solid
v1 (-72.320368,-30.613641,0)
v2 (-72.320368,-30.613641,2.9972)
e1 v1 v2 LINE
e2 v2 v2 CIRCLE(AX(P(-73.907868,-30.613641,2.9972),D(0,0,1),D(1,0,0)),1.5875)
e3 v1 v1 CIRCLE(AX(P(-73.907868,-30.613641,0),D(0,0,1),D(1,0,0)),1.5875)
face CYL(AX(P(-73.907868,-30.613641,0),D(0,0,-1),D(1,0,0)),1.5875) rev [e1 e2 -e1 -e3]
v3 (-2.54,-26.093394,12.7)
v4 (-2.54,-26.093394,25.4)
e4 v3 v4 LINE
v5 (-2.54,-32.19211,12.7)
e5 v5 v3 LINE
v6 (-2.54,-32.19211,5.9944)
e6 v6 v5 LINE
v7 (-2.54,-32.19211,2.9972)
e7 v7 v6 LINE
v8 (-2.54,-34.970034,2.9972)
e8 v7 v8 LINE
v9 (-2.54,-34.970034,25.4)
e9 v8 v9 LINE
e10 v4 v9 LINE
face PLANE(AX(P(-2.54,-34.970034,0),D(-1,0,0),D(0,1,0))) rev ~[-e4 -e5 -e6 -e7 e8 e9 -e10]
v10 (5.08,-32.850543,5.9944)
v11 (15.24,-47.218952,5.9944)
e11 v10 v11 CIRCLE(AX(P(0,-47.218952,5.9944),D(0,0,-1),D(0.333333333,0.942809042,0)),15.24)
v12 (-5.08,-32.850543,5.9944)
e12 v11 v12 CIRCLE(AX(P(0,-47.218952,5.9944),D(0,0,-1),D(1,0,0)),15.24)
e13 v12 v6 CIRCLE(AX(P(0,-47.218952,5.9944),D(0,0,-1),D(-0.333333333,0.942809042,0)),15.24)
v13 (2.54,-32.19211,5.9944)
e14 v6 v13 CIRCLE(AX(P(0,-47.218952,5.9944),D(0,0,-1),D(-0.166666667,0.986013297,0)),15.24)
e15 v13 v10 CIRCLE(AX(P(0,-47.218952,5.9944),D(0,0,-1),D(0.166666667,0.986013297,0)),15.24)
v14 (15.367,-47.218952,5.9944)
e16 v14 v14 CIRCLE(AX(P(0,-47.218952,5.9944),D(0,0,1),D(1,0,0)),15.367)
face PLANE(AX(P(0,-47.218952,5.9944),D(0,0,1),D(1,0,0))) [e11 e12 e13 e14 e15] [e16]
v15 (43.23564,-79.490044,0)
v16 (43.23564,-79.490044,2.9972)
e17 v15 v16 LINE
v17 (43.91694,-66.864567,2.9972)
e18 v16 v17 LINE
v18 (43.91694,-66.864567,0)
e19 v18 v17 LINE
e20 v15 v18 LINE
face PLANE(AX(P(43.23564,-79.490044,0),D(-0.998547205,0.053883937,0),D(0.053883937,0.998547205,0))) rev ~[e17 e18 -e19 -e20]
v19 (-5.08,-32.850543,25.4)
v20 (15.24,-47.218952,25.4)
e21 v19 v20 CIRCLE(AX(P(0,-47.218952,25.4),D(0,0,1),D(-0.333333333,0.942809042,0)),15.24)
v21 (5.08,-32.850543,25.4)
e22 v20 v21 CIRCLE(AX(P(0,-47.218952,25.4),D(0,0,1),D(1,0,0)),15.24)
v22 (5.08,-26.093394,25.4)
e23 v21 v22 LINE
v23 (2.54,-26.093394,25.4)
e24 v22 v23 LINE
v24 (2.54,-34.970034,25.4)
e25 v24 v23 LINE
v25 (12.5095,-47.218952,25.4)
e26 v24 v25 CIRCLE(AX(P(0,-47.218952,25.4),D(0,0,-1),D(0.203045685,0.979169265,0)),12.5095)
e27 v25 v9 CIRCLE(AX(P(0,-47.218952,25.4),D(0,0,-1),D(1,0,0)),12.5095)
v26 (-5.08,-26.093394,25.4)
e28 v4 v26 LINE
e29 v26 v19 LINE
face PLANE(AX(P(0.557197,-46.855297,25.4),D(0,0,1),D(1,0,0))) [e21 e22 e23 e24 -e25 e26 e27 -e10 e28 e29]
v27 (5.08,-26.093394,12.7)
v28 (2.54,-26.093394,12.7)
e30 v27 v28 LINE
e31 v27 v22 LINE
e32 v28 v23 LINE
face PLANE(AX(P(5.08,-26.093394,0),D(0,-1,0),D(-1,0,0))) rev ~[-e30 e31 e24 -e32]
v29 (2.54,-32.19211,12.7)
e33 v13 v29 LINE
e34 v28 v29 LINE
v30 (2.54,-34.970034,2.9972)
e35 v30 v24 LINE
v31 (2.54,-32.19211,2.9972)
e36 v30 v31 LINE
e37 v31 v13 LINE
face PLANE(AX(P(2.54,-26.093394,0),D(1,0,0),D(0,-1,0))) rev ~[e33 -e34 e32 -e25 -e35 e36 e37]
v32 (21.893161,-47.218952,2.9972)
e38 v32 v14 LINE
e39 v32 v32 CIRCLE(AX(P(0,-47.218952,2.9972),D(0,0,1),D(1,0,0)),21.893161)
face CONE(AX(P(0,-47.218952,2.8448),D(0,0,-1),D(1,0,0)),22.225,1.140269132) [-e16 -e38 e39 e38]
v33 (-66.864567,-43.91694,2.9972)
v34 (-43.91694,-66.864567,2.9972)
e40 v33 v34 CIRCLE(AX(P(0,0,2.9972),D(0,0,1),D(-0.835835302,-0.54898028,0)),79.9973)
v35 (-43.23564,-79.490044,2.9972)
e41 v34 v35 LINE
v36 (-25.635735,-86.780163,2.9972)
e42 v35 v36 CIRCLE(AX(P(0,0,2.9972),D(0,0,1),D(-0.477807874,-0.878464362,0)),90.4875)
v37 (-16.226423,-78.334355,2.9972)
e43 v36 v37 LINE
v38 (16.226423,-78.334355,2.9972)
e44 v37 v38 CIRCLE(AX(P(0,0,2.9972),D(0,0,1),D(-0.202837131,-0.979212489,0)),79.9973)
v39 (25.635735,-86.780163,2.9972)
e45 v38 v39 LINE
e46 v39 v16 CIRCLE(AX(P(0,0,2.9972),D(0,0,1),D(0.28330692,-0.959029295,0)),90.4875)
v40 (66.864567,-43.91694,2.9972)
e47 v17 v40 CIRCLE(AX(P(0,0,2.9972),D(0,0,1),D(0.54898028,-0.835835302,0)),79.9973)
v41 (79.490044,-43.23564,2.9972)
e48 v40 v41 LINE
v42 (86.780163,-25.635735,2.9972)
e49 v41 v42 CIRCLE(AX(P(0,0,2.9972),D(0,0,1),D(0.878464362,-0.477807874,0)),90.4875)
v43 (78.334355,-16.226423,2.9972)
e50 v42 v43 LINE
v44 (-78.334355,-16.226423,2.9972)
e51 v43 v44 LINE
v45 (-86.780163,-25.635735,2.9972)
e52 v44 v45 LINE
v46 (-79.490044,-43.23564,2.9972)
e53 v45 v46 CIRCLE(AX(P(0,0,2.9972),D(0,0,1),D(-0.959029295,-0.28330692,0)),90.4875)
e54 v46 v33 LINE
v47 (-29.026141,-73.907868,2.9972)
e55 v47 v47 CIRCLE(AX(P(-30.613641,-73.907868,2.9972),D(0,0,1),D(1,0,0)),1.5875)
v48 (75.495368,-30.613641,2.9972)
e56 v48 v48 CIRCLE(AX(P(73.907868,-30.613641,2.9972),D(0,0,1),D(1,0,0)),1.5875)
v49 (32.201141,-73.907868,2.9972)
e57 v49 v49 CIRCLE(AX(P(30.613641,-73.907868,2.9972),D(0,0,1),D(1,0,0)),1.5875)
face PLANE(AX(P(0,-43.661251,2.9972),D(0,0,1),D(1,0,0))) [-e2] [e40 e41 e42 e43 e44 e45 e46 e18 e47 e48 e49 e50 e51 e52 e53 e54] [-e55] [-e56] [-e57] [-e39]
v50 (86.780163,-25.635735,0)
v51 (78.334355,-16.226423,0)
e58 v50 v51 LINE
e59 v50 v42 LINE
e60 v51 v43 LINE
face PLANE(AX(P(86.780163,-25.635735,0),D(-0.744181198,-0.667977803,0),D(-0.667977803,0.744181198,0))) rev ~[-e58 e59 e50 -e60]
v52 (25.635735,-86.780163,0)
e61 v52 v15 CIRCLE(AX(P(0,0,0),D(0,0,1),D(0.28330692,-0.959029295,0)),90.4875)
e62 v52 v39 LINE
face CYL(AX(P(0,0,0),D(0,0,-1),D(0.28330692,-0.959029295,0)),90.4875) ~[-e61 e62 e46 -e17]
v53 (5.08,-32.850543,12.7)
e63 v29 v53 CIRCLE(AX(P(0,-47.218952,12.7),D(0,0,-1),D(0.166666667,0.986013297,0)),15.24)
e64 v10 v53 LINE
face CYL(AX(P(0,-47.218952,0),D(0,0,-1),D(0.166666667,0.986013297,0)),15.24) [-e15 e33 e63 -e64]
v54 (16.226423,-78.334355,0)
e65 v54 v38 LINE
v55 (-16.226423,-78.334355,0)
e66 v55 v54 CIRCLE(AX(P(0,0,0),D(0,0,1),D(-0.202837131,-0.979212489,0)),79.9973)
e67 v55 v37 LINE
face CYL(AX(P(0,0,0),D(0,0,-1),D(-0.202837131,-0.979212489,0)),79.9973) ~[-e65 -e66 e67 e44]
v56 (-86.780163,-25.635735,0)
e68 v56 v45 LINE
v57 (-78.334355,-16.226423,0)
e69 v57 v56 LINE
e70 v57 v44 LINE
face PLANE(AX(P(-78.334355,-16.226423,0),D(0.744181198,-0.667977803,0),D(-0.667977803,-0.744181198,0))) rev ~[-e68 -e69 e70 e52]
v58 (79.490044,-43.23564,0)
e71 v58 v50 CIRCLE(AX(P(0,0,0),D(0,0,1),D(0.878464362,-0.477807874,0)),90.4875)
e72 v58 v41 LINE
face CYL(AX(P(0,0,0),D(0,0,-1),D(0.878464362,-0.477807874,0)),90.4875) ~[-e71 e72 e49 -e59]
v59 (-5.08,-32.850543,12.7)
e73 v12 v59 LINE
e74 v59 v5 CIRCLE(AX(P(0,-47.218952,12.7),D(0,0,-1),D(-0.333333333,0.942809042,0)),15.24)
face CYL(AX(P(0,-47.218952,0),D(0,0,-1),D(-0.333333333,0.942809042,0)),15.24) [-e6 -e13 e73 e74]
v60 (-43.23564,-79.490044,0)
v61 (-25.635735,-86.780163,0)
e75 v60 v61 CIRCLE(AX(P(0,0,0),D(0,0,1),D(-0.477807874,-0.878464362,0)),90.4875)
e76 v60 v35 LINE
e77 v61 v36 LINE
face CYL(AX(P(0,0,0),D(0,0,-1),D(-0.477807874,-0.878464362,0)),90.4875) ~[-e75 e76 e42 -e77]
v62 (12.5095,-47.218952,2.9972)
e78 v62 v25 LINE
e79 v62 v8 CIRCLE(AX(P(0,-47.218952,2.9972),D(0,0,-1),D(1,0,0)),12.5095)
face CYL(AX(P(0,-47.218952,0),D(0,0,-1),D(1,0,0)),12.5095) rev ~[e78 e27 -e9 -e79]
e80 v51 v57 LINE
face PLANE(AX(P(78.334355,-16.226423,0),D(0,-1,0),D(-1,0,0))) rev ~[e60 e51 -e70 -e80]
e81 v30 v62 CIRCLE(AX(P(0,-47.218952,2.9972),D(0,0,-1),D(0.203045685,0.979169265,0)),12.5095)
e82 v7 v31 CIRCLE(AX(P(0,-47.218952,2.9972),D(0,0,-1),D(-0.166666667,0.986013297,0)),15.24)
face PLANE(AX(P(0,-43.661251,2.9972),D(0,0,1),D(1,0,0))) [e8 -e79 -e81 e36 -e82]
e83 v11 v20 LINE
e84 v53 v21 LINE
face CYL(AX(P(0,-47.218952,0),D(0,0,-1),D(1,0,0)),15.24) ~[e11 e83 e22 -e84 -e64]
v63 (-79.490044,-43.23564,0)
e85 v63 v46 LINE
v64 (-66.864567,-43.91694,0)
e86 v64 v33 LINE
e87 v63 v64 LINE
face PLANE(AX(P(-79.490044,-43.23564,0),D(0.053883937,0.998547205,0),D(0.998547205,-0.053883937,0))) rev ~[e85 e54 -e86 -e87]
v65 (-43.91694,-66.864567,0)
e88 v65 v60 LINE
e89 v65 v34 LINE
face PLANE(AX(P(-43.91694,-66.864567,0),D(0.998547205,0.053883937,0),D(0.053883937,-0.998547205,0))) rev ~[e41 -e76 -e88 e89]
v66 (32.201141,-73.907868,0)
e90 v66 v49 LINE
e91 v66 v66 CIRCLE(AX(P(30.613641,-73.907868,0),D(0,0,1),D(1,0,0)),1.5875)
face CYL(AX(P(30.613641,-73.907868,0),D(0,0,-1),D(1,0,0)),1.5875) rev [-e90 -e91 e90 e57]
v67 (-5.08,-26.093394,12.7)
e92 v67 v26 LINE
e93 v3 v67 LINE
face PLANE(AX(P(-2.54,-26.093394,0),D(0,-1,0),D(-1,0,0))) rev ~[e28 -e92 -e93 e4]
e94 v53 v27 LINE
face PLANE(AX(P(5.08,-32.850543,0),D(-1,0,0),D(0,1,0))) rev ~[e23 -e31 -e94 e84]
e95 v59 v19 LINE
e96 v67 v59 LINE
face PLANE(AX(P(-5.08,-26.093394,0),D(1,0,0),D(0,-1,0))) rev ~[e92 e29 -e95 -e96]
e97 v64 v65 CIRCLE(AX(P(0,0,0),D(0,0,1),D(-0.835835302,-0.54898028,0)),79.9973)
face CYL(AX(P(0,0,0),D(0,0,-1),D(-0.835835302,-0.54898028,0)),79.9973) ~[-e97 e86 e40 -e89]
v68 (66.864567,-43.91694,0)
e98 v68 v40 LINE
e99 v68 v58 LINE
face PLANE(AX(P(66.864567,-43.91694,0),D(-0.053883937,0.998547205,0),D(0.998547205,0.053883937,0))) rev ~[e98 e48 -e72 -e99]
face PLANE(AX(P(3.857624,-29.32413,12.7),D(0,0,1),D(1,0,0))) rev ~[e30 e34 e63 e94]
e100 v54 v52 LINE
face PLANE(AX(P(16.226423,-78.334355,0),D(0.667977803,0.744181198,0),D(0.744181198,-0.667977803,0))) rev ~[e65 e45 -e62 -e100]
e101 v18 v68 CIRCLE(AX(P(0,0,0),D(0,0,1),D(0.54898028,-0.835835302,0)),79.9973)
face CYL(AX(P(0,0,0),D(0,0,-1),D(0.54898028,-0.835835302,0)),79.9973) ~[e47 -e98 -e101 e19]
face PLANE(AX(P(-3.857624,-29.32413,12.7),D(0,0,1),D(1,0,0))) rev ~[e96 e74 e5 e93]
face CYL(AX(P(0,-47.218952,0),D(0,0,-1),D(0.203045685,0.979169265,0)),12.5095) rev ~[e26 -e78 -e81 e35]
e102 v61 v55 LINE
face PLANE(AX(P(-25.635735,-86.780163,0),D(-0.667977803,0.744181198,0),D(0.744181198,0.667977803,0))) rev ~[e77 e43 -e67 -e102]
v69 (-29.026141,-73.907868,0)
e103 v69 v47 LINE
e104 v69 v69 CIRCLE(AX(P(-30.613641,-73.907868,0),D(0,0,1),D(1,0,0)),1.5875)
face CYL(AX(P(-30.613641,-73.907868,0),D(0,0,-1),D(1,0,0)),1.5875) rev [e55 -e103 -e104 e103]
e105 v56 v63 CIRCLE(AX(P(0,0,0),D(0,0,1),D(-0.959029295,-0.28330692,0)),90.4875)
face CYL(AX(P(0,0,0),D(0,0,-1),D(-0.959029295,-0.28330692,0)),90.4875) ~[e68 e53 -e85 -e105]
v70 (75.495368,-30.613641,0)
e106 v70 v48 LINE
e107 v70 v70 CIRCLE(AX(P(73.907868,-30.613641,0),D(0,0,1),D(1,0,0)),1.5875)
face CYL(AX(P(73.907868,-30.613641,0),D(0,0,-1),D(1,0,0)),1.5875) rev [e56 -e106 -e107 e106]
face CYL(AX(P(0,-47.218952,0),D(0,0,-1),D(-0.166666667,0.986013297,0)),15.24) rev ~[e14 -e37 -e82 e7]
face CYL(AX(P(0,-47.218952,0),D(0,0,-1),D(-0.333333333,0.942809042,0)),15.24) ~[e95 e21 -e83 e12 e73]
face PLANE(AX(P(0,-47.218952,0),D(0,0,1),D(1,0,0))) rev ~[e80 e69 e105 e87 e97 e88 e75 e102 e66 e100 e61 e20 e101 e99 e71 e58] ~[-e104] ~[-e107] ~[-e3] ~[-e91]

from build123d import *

# Parameters (mm, degrees)
F0_R     = 1.5875
F0_R_2   = 22.225
F1_DEPTH = 2.9972
F2_DEPTH = 25.4
F3_DEPTH = 25.4
F4_DEPTH = 12.7
F5_DEPTH = 2.9972
F6_DEPTH = 5.9944


# Not quite as in the source:
# - a fillet or chamfer that OpenCascade refuses, or shapes differently, is made with other operations: its cross-section is extruded or revolved along the edge and cut away or added


with BuildPart() as f1:
    # F0 (on Top) → F1 (new body)
    with BuildSketch(Plane.XY):
        with BuildLine():
            Line((-78.3343552322, -16.2264228234), (-86.7801633577, -25.6357348999))
            ThreePointArc((-86.7801633577, -25.6357348999), (-83.5995491981, -34.6280670861), (-79.4900439712, -43.2356399943))
            Line((-79.4900439712, -43.2356399943), (-66.8645673974, -43.9169401718))
            ThreePointArc((-66.8645673974, -43.9169401718), (-56.5666333066, -56.5666333066), (-43.9169401718, -66.8645673974))
            Line((-43.9169401718, -66.8645673974), (-43.2356399943, -79.4900439712))
            ThreePointArc((-43.2356399943, -79.4900439712), (-34.6280670861, -83.5995491981), (-25.6357348999, -86.7801633577))
            Line((-25.6357348999, -86.7801633577), (-16.2264228234, -78.3343552322))
            ThreePointArc((-16.2264228234, -78.3343552322), (0, -79.9973), (16.2264228234, -78.3343552322))
            Line((16.2264228234, -78.3343552322), (25.6357348999, -86.7801633577))
            ThreePointArc((25.6357348999, -86.7801633577), (34.6280670861, -83.5995491981), (43.2356399943, -79.4900439712))
            Line((43.2356399943, -79.4900439712), (43.9169401718, -66.8645673974))
            ThreePointArc((43.9169401718, -66.8645673974), (56.5666333066, -56.5666333066), (66.8645673974, -43.9169401718))
            Line((66.8645673974, -43.9169401718), (79.4900439712, -43.2356399943))
            ThreePointArc((79.4900439712, -43.2356399943), (83.5995491981, -34.6280670861), (86.7801633577, -25.6357348999))
            Line((86.7801633577, -25.6357348999), (78.3343552322, -16.2264228234))
            Line((78.3343552322, -16.2264228234), (-78.3343552322, -16.2264228234))
        make_face()
        with Locations((-30.6136413439, -73.9078681262)):
            Circle(F0_R, mode=Mode.SUBTRACT)
        with Locations((30.6136413439, -73.9078681262)):
            Circle(F0_R, mode=Mode.SUBTRACT)
        with Locations((0, -47.218952328)):
            Circle(F0_R_2, mode=Mode.SUBTRACT)
        with Locations((-73.9078681262, -30.6136413439)):
            Circle(F0_R, mode=Mode.SUBTRACT)
        with Locations((73.9078681262, -30.6136413439)):
            Circle(F0_R, mode=Mode.SUBTRACT)
        with Locations((0, -47.218952328)):
            Circle(F0_R_2)
        with BuildLine():
            ThreePointArc((5.08, -32.8505425343), (12.4434078933, -38.4201342255), (15.24, -47.218952328))
            ThreePointArc((15.24, -47.218952328), (-8.7988181024, -59.6623602213), (-5.08, -32.8505425343))
            Line((-5.08, -32.8505425343), (-5.08, -26.0933935642))
            Line((-5.08, -26.0933935642), (-2.54, -26.0933935642))
            Line((-2.54, -26.0933935642), (-2.54, -32.1921096789))
            ThreePointArc((-2.54, -32.1921096789), (0, -31.978952328), (2.54, -32.1921096789))
            Line((2.54, -32.1921096789), (2.54, -26.0933935642))
            Line((2.54, -26.0933935642), (5.08, -26.0933935642))
            Line((5.08, -26.0933935642), (5.08, -32.8505425343))
        make_face(mode=Mode.SUBTRACT)
        with BuildLine():
            ThreePointArc((-5.08, -32.8505425343), (-8.7988181024, -59.6623602213), (15.24, -47.218952328))
            ThreePointArc((15.24, -47.218952328), (12.4434078933, -38.4201342255), (5.08, -32.8505425343))
            ThreePointArc((5.08, -32.8505425343), (3.8241970996, -32.466558741), (2.54, -32.1921096789))
            Line((2.54, -32.1921096789), (2.54, -34.9700344064))
            ThreePointArc((2.54, -34.9700344064), (9.7021059634, -39.3223245588), (12.5095, -47.218952328))
            ThreePointArc((12.5095, -47.218952328), (-7.8966277692, -56.9210582914), (-2.54, -34.9700344064))
            Line((-2.54, -34.9700344064), (-2.54, -32.1921096789))
            ThreePointArc((-2.54, -32.1921096789), (-3.8241970996, -32.466558741), (-5.08, -32.8505425343))
        make_face()
        with BuildLine():
            ThreePointArc((2.54, -32.1921096789), (3.8241970996, -32.466558741), (5.08, -32.8505425343))
            Line((5.08, -32.8505425343), (5.08, -26.0933935642))
            Line((5.08, -26.0933935642), (2.54, -26.0933935642))
            Line((2.54, -26.0933935642), (2.54, -32.1921096789))
        make_face()
        with BuildLine():
            Line((-5.08, -26.0933935642), (-5.08, -32.8505425343))
            ThreePointArc((-5.08, -32.8505425343), (-3.8241970996, -32.466558741), (-2.54, -32.1921096789))
            Line((-2.54, -32.1921096789), (-2.54, -26.0933935642))
            Line((-2.54, -26.0933935642), (-5.08, -26.0933935642))
        make_face()
        with BuildLine():
            Line((2.54, -34.9700344064), (2.54, -32.1921096789))
            ThreePointArc((2.54, -32.1921096789), (0, -31.978952328), (-2.54, -32.1921096789))
            Line((-2.54, -32.1921096789), (-2.54, -34.9700344064))
            ThreePointArc((-2.54, -34.9700344064), (0, -34.709452328), (2.54, -34.9700344064))
        make_face()
        with BuildLine():
            ThreePointArc((12.5095, -47.218952328), (9.7021059634, -39.3223245588), (2.54, -34.9700344064))
            ThreePointArc((2.54, -34.9700344064), (0, -34.709452328), (-2.54, -34.9700344064))
            ThreePointArc((-2.54, -34.9700344064), (-7.8966277692, -56.9210582914), (12.5095, -47.218952328))
        make_face()
    extrude(amount=F1_DEPTH)

    # F0 (on Top) → F2 (join)
    with BuildSketch(Plane.XY):
        with BuildLine():
            ThreePointArc((-5.08, -32.8505425343), (-8.7988181024, -59.6623602213), (15.24, -47.218952328))
            ThreePointArc((15.24, -47.218952328), (12.4434078933, -38.4201342255), (5.08, -32.8505425343))
            ThreePointArc((5.08, -32.8505425343), (3.8241970996, -32.466558741), (2.54, -32.1921096789))
            Line((2.54, -32.1921096789), (2.54, -34.9700344064))
            ThreePointArc((2.54, -34.9700344064), (9.7021059634, -39.3223245588), (12.5095, -47.218952328))
            ThreePointArc((12.5095, -47.218952328), (-7.8966277692, -56.9210582914), (-2.54, -34.9700344064))
            Line((-2.54, -34.9700344064), (-2.54, -32.1921096789))
            ThreePointArc((-2.54, -32.1921096789), (-3.8241970996, -32.466558741), (-5.08, -32.8505425343))
        make_face()
    extrude(amount=F2_DEPTH)

    # F0 (on Top) → F3 (join)
    with BuildSketch(Plane.XY):
        with BuildLine():
            ThreePointArc((-5.08, -32.8505425343), (-8.7988181024, -59.6623602213), (15.24, -47.218952328))
            ThreePointArc((15.24, -47.218952328), (12.4434078933, -38.4201342255), (5.08, -32.8505425343))
            ThreePointArc((5.08, -32.8505425343), (3.8241970996, -32.466558741), (2.54, -32.1921096789))
            Line((2.54, -32.1921096789), (2.54, -34.9700344064))
            ThreePointArc((2.54, -34.9700344064), (9.7021059634, -39.3223245588), (12.5095, -47.218952328))
            ThreePointArc((12.5095, -47.218952328), (-7.8966277692, -56.9210582914), (-2.54, -34.9700344064))
            Line((-2.54, -34.9700344064), (-2.54, -32.1921096789))
            ThreePointArc((-2.54, -32.1921096789), (-3.8241970996, -32.466558741), (-5.08, -32.8505425343))
        make_face()
        with BuildLine():
            ThreePointArc((2.54, -32.1921096789), (3.8241970996, -32.466558741), (5.08, -32.8505425343))
            Line((5.08, -32.8505425343), (5.08, -26.0933935642))
            Line((5.08, -26.0933935642), (2.54, -26.0933935642))
            Line((2.54, -26.0933935642), (2.54, -32.1921096789))
        make_face()
        with BuildLine():
            Line((-5.08, -26.0933935642), (-5.08, -32.8505425343))
            ThreePointArc((-5.08, -32.8505425343), (-3.8241970996, -32.466558741), (-2.54, -32.1921096789))
            Line((-2.54, -32.1921096789), (-2.54, -26.0933935642))
            Line((-2.54, -26.0933935642), (-5.08, -26.0933935642))
        make_face()
    extrude(amount=F3_DEPTH)

    # F0 (on Top) → F4 (cut)
    with BuildSketch(Plane.XY):
        with BuildLine():
            ThreePointArc((2.54, -32.1921096789), (3.8241970996, -32.466558741), (5.08, -32.8505425343))
            Line((5.08, -32.8505425343), (5.08, -26.0933935642))
            Line((5.08, -26.0933935642), (2.54, -26.0933935642))
            Line((2.54, -26.0933935642), (2.54, -32.1921096789))
        make_face()
        with BuildLine():
            Line((-5.08, -26.0933935642), (-5.08, -32.8505425343))
            ThreePointArc((-5.08, -32.8505425343), (-3.8241970996, -32.466558741), (-2.54, -32.1921096789))
            Line((-2.54, -32.1921096789), (-2.54, -26.0933935642))
            Line((-2.54, -26.0933935642), (-5.08, -26.0933935642))
        make_face()
    extrude(amount=F4_DEPTH, mode=Mode.SUBTRACT)

    # F0 (on Top) → F5 (join)
    with BuildSketch(Plane.XY):
        with BuildLine():
            ThreePointArc((2.54, -32.1921096789), (3.8241970996, -32.466558741), (5.08, -32.8505425343))
            Line((5.08, -32.8505425343), (5.08, -26.0933935642))
            Line((5.08, -26.0933935642), (2.54, -26.0933935642))
            Line((2.54, -26.0933935642), (2.54, -32.1921096789))
        make_face()
        with BuildLine():
            Line((-5.08, -26.0933935642), (-5.08, -32.8505425343))
            ThreePointArc((-5.08, -32.8505425343), (-3.8241970996, -32.466558741), (-2.54, -32.1921096789))
            Line((-2.54, -32.1921096789), (-2.54, -26.0933935642))
            Line((-2.54, -26.0933935642), (-5.08, -26.0933935642))
        make_face()
    extrude(amount=F5_DEPTH)

    # F0 (on Top) → F6 (join)
    with BuildSketch(Plane.XY):
        with Locations((0, -47.218952328)):
            Circle(F0_R_2)
        with BuildLine():
            ThreePointArc((5.08, -32.8505425343), (12.4434078933, -38.4201342255), (15.24, -47.218952328))
            ThreePointArc((15.24, -47.218952328), (-8.7988181024, -59.6623602213), (-5.08, -32.8505425343))
            Line((-5.08, -32.8505425343), (-5.08, -26.0933935642))
            Line((-5.08, -26.0933935642), (-2.54, -26.0933935642))
            Line((-2.54, -26.0933935642), (-2.54, -32.1921096789))
            ThreePointArc((-2.54, -32.1921096789), (0, -31.978952328), (2.54, -32.1921096789))
            Line((2.54, -32.1921096789), (2.54, -26.0933935642))
            Line((2.54, -26.0933935642), (5.08, -26.0933935642))
            Line((5.08, -26.0933935642), (5.08, -32.8505425343))
        make_face(mode=Mode.SUBTRACT)
        with BuildLine():
            ThreePointArc((2.54, -32.1921096789), (3.8241970996, -32.466558741), (5.08, -32.8505425343))
            Line((5.08, -32.8505425343), (5.08, -26.0933935642))
            Line((5.08, -26.0933935642), (2.54, -26.0933935642))
            Line((2.54, -26.0933935642), (2.54, -32.1921096789))
        make_face()
        with BuildLine():
            Line((-5.08, -26.0933935642), (-5.08, -32.8505425343))
            ThreePointArc((-5.08, -32.8505425343), (-3.8241970996, -32.466558741), (-2.54, -32.1921096789))
            Line((-2.54, -32.1921096789), (-2.54, -26.0933935642))
            Line((-2.54, -26.0933935642), (-5.08, -26.0933935642))
        make_face()
    extrude(amount=F6_DEPTH)

    # F7: chamfer of 6.858 x 3.1496 on 1 edges, made by hand


with BuildPart() as f7_tool2:
    # F7_s3 → F7_t4 (revolve)
    with BuildSketch(Plane.XZ.offset(47.218952328)):
        Polygon((22.225, 2.8448), (15.367, 5.9944), (22.225, 5.9944), align=None)
    revolve(axis=Axis((0, -47.218952328, 5.9944), (0, 0, 1)))

    split(bisect_by=Plane.XY.offset(2.9972), keep=Keep.TOP)


with BuildPart() as f1_1:
    add(f1.part)

    # F7_t1: cut F7_tool2
    add(f7_tool2.part, mode=Mode.SUBTRACT)


solid = f1_1.part
